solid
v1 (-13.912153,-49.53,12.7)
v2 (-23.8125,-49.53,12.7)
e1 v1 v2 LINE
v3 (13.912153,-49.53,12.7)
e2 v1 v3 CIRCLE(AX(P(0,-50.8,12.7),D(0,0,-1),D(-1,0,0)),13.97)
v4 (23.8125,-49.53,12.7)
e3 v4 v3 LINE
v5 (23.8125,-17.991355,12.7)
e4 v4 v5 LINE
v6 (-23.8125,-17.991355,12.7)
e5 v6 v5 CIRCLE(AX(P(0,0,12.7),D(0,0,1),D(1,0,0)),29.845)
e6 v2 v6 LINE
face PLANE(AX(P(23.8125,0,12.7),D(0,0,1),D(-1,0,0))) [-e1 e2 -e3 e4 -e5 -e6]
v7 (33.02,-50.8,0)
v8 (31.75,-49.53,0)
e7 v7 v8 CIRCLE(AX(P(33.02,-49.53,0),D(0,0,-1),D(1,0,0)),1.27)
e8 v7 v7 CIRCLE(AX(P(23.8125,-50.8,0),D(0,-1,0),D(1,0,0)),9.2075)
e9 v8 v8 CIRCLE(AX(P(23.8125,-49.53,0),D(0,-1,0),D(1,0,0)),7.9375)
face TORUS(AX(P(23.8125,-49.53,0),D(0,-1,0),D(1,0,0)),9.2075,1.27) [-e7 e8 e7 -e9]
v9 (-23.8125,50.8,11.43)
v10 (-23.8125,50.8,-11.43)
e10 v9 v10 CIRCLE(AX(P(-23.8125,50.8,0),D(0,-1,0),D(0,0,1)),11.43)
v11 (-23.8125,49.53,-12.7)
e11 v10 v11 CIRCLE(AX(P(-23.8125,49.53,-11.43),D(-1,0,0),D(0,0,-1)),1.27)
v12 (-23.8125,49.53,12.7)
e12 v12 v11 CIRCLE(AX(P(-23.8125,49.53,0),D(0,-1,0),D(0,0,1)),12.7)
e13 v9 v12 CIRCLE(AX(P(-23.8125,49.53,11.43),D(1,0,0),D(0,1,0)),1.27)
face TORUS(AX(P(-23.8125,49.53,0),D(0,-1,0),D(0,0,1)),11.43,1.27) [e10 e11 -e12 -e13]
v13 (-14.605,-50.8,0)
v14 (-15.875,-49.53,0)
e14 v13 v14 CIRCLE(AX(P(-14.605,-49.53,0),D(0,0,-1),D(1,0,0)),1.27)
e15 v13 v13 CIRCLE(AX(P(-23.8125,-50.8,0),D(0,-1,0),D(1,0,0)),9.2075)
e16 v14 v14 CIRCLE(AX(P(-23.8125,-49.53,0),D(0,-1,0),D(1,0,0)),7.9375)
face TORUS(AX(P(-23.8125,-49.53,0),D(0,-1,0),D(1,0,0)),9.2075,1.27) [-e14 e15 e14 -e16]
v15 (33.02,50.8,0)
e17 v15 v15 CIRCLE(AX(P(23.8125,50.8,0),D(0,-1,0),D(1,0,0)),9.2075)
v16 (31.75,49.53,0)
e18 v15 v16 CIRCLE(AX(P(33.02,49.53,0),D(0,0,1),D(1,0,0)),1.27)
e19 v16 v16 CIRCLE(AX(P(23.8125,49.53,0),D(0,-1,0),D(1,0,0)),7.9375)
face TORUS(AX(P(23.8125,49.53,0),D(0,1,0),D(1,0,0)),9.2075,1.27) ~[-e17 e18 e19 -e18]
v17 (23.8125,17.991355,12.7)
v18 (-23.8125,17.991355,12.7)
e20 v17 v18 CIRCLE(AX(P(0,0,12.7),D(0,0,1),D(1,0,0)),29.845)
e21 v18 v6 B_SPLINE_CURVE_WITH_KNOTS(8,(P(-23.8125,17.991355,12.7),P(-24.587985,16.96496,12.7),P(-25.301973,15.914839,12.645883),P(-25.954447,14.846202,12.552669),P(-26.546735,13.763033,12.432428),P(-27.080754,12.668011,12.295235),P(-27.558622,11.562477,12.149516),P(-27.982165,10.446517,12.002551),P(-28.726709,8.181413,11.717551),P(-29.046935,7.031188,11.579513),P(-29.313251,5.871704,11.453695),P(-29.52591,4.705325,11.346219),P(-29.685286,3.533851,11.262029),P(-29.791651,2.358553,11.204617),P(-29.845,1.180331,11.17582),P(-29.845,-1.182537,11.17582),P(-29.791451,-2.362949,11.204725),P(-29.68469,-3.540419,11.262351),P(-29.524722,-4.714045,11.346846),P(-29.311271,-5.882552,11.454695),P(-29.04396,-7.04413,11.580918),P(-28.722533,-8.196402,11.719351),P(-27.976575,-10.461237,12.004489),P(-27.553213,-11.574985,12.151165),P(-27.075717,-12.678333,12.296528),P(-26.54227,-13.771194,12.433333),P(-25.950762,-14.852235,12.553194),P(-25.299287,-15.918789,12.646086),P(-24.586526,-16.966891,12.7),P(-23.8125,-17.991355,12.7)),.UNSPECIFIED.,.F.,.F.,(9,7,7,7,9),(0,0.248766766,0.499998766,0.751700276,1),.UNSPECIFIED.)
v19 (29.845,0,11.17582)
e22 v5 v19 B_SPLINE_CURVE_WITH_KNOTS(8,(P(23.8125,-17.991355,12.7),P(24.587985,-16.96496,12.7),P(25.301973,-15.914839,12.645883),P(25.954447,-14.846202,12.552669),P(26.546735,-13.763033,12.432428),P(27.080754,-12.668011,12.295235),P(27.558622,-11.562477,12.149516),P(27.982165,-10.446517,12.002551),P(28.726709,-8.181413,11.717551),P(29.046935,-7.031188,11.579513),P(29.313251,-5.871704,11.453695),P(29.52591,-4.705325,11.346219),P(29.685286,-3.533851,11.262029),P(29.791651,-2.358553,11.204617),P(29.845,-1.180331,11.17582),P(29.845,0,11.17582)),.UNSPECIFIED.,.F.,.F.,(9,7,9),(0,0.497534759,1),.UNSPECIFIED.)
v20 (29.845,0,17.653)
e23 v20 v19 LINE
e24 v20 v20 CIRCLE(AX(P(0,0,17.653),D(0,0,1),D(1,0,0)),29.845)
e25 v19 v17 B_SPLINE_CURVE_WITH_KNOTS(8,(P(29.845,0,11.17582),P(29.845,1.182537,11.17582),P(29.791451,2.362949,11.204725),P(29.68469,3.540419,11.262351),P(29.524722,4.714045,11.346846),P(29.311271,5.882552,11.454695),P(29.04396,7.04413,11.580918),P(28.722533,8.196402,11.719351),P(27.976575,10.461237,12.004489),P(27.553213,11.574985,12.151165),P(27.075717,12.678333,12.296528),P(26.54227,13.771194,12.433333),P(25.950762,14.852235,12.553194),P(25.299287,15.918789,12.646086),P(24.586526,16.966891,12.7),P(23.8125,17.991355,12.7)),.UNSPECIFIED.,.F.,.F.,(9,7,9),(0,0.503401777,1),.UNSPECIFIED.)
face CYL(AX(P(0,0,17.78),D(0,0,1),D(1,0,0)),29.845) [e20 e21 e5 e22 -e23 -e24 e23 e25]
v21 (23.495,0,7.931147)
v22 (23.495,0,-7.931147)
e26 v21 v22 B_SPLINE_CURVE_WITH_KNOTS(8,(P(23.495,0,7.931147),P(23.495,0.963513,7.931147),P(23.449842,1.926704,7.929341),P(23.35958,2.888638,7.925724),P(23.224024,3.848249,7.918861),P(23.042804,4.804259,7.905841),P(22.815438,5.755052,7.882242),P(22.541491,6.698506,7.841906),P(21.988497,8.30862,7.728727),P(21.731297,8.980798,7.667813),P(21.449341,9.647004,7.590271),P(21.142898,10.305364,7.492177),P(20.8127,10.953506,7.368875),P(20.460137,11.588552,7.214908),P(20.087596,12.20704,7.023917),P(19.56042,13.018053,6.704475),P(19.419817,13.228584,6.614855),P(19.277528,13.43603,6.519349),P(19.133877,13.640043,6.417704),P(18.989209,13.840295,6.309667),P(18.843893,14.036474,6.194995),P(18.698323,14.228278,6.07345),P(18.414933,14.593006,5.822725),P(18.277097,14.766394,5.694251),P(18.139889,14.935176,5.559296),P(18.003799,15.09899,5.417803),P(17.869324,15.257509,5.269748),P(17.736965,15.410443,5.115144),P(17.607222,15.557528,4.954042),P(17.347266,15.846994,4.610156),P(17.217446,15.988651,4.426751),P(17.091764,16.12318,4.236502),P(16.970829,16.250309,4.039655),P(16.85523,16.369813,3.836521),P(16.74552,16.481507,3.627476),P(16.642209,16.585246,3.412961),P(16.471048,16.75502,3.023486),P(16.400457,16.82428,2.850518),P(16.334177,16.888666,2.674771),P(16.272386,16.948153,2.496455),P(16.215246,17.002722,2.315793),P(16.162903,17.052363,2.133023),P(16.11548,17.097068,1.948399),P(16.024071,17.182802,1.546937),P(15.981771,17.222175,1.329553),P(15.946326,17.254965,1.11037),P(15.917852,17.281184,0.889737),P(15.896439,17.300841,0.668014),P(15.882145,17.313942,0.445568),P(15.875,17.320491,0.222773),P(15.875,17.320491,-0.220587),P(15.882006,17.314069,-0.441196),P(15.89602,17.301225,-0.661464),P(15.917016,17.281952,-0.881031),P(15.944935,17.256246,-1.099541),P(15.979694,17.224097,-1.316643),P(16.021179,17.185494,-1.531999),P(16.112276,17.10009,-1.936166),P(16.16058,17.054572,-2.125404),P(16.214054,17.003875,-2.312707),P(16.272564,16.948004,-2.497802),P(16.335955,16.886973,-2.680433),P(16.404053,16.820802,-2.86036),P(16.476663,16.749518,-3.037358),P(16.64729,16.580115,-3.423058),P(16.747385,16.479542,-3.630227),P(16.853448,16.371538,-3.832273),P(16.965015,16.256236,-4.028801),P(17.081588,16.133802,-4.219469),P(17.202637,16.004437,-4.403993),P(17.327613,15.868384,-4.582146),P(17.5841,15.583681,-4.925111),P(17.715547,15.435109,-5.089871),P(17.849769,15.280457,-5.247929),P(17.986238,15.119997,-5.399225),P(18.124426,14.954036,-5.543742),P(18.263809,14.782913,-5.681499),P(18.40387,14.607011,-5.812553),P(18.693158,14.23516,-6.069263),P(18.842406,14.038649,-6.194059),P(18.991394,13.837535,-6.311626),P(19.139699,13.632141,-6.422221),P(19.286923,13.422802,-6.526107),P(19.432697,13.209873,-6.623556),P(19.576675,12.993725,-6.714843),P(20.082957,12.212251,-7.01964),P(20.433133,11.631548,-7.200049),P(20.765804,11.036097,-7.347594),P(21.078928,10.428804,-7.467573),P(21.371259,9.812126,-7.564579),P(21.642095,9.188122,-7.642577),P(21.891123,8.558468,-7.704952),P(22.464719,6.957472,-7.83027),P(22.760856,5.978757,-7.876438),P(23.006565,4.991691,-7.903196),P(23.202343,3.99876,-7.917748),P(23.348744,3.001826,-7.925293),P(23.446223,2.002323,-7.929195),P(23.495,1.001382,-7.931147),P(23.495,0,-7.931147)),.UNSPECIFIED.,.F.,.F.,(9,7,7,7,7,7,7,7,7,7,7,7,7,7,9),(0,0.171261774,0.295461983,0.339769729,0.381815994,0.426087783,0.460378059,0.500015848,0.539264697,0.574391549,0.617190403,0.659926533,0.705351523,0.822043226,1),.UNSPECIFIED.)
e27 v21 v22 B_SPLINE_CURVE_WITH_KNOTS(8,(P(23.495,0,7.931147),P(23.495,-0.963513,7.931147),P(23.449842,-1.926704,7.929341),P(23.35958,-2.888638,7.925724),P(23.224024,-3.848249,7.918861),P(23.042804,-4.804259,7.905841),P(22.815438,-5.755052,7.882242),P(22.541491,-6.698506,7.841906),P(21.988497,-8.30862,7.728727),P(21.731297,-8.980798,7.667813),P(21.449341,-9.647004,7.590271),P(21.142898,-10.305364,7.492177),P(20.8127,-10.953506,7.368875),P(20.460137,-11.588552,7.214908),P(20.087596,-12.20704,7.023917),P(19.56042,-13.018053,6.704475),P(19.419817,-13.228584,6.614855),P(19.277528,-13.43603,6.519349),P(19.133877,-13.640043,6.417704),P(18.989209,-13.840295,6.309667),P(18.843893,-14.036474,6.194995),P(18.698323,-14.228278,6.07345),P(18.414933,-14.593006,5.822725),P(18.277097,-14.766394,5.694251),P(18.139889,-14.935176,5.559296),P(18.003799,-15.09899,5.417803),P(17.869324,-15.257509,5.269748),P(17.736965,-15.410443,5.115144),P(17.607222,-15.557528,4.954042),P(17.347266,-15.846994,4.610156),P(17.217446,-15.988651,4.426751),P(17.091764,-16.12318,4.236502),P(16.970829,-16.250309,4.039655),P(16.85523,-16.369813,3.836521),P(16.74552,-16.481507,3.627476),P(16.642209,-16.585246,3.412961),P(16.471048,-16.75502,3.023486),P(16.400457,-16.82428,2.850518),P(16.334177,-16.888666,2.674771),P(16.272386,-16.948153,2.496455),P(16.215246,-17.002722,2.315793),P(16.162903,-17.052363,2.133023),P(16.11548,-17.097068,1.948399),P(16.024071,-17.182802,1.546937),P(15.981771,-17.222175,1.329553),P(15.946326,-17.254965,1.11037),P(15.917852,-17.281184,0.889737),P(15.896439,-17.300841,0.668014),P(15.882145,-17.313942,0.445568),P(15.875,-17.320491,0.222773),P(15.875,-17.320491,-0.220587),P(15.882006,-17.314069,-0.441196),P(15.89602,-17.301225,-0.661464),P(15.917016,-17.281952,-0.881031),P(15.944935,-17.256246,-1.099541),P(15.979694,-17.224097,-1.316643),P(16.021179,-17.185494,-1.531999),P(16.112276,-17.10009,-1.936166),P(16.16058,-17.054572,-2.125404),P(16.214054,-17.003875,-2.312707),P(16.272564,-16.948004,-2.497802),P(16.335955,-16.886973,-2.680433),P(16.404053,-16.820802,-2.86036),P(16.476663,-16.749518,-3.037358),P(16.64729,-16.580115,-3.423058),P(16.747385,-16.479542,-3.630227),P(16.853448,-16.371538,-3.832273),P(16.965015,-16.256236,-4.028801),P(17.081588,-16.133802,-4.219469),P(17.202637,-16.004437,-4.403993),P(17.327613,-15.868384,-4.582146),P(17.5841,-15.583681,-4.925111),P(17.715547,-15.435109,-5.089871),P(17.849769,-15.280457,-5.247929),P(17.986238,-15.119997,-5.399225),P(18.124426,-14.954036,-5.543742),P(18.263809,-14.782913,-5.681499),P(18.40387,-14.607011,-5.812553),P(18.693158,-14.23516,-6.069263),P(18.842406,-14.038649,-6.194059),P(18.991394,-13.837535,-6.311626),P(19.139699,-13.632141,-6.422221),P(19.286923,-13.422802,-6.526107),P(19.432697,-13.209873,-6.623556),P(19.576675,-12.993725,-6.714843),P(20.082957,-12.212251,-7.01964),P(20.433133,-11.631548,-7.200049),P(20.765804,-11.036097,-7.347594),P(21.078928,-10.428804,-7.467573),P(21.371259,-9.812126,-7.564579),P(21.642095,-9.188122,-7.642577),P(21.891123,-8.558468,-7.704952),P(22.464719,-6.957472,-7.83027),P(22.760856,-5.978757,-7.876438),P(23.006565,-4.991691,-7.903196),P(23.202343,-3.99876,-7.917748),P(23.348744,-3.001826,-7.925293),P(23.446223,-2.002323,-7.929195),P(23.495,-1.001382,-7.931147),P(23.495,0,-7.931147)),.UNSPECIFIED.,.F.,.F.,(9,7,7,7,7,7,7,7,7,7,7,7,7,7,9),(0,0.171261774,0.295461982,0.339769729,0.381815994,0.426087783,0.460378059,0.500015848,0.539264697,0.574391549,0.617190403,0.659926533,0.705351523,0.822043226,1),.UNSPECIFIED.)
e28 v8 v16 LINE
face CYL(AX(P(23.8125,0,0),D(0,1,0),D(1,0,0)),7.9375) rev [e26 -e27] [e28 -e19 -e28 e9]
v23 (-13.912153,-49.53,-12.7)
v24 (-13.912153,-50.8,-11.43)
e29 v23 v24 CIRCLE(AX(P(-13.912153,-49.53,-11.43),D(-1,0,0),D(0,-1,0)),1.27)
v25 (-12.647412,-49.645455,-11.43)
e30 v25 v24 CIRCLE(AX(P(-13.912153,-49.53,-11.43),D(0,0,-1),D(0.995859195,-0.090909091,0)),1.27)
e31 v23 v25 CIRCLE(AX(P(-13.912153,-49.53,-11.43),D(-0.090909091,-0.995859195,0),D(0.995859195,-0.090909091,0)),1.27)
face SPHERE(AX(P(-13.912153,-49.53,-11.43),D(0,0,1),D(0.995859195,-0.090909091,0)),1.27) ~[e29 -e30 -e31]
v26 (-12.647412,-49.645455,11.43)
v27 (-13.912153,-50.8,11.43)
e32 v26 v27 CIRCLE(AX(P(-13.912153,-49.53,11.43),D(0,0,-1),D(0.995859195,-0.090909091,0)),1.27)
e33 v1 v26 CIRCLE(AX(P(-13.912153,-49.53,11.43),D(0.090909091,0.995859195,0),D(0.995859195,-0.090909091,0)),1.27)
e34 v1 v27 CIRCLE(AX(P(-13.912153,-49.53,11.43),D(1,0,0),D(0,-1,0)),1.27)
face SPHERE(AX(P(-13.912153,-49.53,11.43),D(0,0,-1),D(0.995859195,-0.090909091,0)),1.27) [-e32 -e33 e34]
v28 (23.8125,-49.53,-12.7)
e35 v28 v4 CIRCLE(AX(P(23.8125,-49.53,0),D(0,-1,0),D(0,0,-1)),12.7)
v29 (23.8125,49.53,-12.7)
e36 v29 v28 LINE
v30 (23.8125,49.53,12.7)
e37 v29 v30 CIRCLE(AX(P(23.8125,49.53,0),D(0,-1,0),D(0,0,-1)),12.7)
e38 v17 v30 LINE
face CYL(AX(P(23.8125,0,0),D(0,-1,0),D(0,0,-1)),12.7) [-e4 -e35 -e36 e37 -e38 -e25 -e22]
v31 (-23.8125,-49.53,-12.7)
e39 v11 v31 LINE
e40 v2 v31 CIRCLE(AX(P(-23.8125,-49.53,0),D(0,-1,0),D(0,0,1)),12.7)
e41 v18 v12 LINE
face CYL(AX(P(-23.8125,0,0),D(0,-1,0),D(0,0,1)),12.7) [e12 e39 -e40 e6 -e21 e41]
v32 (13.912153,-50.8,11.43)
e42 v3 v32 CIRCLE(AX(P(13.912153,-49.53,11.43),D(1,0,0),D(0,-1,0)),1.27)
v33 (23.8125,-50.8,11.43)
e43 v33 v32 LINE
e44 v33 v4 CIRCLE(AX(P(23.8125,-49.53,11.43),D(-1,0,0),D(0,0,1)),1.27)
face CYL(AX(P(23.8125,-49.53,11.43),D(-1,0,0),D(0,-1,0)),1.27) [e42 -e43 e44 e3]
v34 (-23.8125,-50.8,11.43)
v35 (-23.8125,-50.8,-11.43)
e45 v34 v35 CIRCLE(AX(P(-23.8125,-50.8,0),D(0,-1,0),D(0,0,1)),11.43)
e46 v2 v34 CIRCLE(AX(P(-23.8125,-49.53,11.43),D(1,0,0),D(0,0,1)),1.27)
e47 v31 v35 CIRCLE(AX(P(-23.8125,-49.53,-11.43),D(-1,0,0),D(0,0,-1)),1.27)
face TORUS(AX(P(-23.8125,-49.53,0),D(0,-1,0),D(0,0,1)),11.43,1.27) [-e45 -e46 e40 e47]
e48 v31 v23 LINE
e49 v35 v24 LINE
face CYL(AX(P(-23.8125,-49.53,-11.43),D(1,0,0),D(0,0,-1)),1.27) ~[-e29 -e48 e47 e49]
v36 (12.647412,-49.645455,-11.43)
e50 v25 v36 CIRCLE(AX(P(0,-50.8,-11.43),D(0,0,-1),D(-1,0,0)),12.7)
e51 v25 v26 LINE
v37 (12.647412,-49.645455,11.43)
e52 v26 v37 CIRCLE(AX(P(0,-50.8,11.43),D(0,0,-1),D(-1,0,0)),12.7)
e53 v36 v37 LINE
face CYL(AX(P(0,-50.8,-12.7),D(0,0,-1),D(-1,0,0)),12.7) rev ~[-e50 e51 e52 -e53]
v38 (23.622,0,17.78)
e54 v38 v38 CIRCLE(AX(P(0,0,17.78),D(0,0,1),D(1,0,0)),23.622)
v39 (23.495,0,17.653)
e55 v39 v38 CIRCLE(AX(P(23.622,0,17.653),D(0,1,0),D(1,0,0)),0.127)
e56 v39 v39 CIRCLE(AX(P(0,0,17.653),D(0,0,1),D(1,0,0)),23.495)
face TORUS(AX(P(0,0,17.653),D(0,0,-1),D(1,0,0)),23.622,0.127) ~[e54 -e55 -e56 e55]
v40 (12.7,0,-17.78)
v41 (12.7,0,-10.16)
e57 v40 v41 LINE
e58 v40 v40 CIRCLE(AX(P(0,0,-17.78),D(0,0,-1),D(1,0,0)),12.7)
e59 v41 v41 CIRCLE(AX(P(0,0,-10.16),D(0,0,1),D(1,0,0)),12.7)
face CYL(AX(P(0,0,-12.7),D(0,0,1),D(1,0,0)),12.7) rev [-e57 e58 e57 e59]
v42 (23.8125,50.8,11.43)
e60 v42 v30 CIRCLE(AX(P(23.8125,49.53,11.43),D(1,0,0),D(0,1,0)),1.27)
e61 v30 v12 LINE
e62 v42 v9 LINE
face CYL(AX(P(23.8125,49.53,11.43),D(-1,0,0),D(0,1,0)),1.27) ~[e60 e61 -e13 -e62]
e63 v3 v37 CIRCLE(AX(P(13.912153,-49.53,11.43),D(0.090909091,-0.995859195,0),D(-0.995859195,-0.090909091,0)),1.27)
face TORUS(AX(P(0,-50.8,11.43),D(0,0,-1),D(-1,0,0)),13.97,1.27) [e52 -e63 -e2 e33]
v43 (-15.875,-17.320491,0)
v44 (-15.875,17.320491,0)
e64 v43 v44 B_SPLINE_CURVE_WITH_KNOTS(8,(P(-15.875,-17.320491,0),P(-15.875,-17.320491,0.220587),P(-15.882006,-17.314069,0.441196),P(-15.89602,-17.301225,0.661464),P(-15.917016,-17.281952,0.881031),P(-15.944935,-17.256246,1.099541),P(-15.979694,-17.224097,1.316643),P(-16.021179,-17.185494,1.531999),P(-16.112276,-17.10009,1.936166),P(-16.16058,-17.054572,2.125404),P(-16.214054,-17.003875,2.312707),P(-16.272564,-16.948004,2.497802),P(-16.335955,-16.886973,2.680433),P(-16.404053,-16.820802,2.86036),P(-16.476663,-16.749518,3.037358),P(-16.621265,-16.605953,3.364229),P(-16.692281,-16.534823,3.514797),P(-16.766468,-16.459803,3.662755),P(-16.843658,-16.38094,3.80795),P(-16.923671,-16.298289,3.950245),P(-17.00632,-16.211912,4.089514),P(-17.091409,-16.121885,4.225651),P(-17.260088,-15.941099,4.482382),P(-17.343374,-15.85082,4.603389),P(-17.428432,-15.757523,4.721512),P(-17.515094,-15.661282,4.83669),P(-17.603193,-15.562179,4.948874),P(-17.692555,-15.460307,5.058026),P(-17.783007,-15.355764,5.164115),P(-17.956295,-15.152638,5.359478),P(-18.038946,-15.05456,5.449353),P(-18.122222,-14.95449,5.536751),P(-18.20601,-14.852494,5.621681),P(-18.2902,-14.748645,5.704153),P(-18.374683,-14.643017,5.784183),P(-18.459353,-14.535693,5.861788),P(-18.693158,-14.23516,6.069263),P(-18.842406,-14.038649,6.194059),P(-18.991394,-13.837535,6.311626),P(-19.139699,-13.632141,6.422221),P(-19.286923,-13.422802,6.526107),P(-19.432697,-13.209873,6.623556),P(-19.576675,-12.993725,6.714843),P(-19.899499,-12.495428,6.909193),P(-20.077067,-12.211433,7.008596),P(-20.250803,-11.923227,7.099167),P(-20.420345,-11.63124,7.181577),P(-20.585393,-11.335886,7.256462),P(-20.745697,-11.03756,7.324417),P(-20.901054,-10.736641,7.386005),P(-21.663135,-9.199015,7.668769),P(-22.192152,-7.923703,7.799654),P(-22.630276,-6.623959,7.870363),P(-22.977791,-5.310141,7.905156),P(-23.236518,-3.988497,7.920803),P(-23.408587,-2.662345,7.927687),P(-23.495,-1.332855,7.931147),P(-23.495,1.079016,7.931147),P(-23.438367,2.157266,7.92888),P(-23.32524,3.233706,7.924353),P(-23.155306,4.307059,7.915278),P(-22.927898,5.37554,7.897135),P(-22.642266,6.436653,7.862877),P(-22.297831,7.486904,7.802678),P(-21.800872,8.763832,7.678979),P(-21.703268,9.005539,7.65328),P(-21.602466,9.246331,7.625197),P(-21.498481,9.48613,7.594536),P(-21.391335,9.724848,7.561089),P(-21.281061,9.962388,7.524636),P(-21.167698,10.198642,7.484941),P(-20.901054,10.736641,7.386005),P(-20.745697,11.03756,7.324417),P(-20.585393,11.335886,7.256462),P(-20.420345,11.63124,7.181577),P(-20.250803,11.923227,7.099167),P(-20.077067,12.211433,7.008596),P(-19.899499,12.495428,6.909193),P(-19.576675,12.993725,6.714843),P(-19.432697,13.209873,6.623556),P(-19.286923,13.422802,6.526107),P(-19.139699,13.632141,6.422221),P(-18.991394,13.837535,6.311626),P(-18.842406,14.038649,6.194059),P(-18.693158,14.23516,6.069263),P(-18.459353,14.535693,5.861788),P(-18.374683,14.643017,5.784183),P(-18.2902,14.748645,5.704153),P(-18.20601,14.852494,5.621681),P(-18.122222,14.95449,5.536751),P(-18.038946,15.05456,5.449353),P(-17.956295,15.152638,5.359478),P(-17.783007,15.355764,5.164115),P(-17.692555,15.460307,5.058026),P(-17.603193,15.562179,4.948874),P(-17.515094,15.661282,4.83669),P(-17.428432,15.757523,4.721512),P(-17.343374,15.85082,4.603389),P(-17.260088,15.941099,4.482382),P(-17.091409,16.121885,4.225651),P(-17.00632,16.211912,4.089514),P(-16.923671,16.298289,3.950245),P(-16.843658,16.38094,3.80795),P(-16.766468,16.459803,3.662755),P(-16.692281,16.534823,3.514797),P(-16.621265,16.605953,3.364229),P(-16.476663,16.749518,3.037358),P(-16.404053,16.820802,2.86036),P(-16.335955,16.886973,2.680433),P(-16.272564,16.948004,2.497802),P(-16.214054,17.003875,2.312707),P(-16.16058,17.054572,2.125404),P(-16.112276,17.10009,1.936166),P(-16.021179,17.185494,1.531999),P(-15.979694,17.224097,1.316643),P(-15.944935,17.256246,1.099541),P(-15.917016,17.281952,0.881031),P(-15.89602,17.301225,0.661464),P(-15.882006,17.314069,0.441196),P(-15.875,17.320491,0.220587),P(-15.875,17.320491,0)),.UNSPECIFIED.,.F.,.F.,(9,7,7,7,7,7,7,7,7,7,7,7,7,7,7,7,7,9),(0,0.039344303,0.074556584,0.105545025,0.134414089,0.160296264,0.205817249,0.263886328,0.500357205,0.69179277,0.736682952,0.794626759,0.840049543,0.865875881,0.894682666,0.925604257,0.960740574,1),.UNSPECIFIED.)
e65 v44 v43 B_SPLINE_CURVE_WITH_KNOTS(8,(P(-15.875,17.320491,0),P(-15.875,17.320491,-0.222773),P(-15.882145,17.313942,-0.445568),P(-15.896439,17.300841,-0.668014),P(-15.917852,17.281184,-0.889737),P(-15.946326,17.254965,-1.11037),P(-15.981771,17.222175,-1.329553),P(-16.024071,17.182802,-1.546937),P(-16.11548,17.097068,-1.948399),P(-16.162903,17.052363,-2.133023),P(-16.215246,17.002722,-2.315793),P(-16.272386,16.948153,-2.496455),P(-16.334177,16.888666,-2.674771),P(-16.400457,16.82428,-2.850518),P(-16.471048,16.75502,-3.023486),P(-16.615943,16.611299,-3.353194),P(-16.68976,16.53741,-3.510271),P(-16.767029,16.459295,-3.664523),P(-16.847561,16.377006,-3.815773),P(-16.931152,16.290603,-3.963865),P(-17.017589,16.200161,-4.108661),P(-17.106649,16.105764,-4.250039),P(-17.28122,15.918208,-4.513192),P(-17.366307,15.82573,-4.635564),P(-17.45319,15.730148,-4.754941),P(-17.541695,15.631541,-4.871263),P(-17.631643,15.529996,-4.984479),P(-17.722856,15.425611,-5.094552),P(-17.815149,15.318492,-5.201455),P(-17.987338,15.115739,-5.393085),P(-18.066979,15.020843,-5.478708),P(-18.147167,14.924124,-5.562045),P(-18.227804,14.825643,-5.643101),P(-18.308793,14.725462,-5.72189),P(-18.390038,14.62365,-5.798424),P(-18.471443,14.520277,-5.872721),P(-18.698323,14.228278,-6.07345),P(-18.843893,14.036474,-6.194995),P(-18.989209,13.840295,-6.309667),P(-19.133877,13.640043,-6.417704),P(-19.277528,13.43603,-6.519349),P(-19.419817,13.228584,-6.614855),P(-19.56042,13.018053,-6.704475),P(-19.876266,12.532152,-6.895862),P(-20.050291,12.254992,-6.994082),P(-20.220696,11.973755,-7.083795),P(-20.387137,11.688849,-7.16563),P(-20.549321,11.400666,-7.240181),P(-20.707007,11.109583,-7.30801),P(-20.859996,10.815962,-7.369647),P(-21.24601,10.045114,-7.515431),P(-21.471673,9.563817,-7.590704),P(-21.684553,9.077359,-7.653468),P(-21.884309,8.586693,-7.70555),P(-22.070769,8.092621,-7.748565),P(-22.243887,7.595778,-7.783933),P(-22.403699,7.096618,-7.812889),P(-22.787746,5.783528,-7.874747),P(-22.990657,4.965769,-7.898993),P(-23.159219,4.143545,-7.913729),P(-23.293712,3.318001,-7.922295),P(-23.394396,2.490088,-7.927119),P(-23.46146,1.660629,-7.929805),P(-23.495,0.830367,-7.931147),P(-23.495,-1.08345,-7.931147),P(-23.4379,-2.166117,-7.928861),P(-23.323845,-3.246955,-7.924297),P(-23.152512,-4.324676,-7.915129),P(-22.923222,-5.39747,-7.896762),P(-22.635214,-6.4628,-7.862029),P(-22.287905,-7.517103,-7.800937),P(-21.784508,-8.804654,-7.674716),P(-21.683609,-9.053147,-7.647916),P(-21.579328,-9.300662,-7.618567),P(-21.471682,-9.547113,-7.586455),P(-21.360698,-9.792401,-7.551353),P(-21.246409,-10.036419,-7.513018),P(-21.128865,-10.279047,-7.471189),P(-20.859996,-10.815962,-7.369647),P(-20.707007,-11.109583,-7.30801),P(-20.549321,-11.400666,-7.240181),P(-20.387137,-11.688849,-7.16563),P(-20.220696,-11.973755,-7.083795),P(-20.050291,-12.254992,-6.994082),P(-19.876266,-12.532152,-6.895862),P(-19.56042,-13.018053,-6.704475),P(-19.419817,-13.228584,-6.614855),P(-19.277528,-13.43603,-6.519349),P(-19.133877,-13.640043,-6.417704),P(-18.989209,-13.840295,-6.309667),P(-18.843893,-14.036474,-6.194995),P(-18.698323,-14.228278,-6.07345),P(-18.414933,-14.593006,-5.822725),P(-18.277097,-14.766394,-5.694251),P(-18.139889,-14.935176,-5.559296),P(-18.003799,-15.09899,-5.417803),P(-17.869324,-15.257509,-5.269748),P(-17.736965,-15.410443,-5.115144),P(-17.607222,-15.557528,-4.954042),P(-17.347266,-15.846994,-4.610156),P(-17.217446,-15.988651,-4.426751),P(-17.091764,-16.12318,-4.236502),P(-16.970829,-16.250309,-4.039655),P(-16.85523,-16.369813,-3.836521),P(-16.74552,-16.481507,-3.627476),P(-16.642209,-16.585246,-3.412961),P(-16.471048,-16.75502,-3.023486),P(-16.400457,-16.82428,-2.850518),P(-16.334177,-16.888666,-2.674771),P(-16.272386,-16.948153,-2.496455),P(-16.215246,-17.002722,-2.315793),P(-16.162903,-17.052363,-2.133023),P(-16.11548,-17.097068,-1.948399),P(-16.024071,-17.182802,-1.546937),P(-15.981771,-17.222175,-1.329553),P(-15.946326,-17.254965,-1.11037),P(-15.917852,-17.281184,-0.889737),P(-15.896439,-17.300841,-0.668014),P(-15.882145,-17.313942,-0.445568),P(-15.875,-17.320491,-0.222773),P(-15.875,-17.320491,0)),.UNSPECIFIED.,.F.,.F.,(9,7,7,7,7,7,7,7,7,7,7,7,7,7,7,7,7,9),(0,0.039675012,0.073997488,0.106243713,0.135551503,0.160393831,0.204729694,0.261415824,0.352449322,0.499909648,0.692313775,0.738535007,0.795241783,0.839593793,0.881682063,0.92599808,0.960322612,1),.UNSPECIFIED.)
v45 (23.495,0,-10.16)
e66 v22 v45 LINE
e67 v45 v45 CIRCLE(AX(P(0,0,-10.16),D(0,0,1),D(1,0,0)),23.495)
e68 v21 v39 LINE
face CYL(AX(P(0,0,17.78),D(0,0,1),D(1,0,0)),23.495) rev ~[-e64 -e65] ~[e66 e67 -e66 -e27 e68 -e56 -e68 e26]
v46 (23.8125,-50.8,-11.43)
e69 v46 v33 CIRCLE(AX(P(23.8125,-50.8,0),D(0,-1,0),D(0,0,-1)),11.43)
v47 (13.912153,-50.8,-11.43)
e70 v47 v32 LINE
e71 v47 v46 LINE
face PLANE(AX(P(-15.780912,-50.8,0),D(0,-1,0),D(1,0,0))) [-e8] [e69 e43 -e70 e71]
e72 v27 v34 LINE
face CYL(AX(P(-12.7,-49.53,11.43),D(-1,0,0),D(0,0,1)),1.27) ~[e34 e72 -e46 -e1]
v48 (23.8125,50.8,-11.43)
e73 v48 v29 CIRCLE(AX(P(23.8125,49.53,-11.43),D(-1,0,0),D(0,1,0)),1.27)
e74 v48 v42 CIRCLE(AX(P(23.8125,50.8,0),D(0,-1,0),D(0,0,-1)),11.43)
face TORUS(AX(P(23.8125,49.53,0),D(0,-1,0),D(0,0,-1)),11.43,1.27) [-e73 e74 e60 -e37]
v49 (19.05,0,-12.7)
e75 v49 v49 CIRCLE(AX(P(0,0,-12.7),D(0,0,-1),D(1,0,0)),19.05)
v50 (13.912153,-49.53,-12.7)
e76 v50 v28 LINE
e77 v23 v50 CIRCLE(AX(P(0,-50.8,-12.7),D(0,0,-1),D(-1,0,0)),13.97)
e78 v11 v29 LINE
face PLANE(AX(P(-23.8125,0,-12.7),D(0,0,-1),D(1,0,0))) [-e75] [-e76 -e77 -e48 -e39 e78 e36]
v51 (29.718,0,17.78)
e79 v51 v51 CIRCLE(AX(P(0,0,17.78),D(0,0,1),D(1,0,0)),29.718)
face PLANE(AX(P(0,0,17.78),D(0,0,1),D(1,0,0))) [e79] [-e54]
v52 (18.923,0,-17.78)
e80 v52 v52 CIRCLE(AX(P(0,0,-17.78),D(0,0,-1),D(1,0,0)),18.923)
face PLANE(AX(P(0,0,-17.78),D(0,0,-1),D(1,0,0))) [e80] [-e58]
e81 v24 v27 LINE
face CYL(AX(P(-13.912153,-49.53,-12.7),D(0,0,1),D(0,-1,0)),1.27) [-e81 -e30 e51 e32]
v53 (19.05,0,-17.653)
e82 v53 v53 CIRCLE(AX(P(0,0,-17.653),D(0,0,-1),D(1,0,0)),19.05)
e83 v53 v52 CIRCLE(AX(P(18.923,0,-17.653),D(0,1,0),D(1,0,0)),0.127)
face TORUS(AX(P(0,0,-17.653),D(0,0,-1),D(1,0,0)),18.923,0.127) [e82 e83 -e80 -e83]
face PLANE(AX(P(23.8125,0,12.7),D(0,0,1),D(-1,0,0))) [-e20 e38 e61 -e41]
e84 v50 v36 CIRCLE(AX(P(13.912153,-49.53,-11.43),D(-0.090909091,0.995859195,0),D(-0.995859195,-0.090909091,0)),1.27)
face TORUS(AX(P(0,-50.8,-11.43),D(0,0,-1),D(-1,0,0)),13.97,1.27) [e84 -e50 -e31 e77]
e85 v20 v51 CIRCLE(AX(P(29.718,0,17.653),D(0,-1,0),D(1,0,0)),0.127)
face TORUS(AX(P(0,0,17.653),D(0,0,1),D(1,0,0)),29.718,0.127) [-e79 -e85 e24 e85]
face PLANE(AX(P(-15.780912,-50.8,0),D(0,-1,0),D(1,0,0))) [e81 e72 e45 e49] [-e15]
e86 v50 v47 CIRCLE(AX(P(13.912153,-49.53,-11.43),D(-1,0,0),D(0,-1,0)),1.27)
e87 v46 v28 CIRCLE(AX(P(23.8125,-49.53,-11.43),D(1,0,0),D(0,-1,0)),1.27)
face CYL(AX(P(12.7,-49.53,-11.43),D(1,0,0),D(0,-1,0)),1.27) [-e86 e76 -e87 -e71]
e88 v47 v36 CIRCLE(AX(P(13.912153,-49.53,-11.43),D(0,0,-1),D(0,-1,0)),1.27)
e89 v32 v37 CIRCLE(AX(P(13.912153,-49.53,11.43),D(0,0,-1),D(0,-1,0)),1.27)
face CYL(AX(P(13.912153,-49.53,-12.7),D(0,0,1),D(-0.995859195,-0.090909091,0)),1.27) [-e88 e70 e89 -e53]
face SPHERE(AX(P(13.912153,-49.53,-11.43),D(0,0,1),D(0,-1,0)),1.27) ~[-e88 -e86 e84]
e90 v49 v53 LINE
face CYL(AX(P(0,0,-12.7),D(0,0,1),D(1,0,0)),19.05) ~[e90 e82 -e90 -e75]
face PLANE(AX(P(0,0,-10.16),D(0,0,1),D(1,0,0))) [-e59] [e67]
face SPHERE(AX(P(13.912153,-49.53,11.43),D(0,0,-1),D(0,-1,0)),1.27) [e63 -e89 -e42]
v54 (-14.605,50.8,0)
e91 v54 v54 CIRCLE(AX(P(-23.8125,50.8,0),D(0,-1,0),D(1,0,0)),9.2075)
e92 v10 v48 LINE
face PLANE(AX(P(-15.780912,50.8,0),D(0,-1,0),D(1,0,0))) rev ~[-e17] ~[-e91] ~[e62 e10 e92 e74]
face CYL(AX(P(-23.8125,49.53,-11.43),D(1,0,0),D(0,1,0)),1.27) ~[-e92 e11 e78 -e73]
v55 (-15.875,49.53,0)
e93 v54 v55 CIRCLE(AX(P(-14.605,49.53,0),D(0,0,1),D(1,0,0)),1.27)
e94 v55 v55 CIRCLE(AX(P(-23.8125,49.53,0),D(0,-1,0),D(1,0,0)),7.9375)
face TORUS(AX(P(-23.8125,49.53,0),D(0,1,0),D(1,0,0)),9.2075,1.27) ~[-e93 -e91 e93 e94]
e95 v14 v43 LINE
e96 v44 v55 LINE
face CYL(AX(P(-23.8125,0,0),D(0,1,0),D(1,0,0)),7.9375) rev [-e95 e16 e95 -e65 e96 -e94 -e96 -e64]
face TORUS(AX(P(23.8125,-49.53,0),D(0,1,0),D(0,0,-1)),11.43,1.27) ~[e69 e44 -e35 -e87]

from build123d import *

# Parameters (mm, degrees)
F0_R     = 7.9375
F1_DEPTH = 50.8
F2_R     = 12.7
F3_DEPTH = 25.401
F4_R     = 23.495
F4_R_2   = 12.7
F5_DEPTH = 22.86
F6_R     = 19.05
F6_R_2   = 12.7
F7_DEPTH = 5.08
F9_DEPTH = 25.4010001
F10_R    = 1.27
F12_R    = 29.845
F12_R_2  = 23.495
F14_R    = 0.127


# Not quite as in the source:
# - a feature names something its author has since deleted; it is built from what else it names


with BuildPart() as f1:
    # F0 (on Front) → F1 (new body, symmetric)
    with BuildSketch(Plane.XZ):
        with BuildLine():
            ThreePointArc((-23.8125, 12.7), (-36.5125, 0), (-23.8125, -12.7))
            Line((-23.8125, -12.7), (0, -12.7))
            Line((0, -12.7), (0, 12.7))
            Line((0, 12.7), (-23.8125, 12.7))
        make_face()
        with Locations((-23.8125, 0)):
            Circle(F0_R, mode=Mode.SUBTRACT)
        with BuildLine():
            Line((0, 12.7), (0, -12.7))
            Line((0, -12.7), (23.8125, -12.7))
            ThreePointArc((23.8125, -12.7), (36.5125, 0), (23.8125, 12.7))
            Line((23.8125, 12.7), (0, 12.7))
        make_face()
        with Locations((23.8125, 0)):
            Circle(F0_R, mode=Mode.SUBTRACT)
    extrude(amount=F1_DEPTH, both=True)

    # F2 (on face) → F3 (cut, through all)
    with BuildSketch(Plane.XY.offset(12.7)):
        Circle(F2_R)
    extrude(amount=-F3_DEPTH, mode=Mode.SUBTRACT)

    # F4 (on face) → F5 (cut)
    with BuildSketch(Plane.XY.offset(12.7)):
        Circle(F4_R)
        Circle(F4_R_2, mode=Mode.SUBTRACT)
    extrude(amount=-F5_DEPTH, mode=Mode.SUBTRACT)

    # F6 (on face) → F7 (join)
    with BuildSketch(Plane(origin=(0, 0, -12.7), x_dir=(1, 0, 0), z_dir=(0, 0, -1))):
        Circle(F6_R)
        Circle(F6_R_2, mode=Mode.SUBTRACT)
    extrude(amount=F7_DEPTH)

    # F8 (on face) → F9 (cut, through all)
    with BuildSketch(Plane(origin=(0, 0, -12.7), x_dir=(1, 0, 0), z_dir=(0, 0, -1))):
        with BuildLine():
            Line((12.7, 50.8), (-12.7, 50.8))
            ThreePointArc((-12.7, 50.8), (0, 38.1), (12.7, 50.8))
        make_face()
    extrude(amount=-F9_DEPTH, mode=Mode.SUBTRACT)

    # F10
    f10_edges = [f1.edges().sort_by_distance(p)[0] for p in [
        (0, 50.8, 12.7),
        (-36.5125, -50.8, 0),
        (-18.25625, -50.8, 12.7),
        (-12.7, -50.8, 0),
        (-18.25625, -50.8, -12.7),
        (-31.75, -50.8, 0),
        (12.7, -50.8, 0),
        (18.25625, -50.8, 12.7),
        (36.5125, -50.8, 0),
        (18.25625, -50.8, -12.7),
        (15.875, -50.8, 0),
        (0, -38.1, -12.7),
        (0, -38.1, 12.7),
        (15.875, 50.8, 0),
        (-31.75, 50.8, 0),
    ]]
    fillet(f10_edges, radius=F10_R)

    # F12 (on offset) → F13 (join, up to the next surface of F1)
    with BuildSketch(Plane.XY.offset(17.78)):
        Circle(F12_R)
        Circle(F12_R_2, mode=Mode.SUBTRACT)
    extrude(until=Until.NEXT, dir=(0, 0, -1))

    # F14
    f14_edges = [f1.edges().sort_by_distance(p)[0] for p in [
        (-29.845, 0, 17.78),
        (-23.495, 0, 17.78),
        (-19.05, 0, -17.78),
    ]]
    fillet(f14_edges, radius=F14_R)


solid = f1.part
